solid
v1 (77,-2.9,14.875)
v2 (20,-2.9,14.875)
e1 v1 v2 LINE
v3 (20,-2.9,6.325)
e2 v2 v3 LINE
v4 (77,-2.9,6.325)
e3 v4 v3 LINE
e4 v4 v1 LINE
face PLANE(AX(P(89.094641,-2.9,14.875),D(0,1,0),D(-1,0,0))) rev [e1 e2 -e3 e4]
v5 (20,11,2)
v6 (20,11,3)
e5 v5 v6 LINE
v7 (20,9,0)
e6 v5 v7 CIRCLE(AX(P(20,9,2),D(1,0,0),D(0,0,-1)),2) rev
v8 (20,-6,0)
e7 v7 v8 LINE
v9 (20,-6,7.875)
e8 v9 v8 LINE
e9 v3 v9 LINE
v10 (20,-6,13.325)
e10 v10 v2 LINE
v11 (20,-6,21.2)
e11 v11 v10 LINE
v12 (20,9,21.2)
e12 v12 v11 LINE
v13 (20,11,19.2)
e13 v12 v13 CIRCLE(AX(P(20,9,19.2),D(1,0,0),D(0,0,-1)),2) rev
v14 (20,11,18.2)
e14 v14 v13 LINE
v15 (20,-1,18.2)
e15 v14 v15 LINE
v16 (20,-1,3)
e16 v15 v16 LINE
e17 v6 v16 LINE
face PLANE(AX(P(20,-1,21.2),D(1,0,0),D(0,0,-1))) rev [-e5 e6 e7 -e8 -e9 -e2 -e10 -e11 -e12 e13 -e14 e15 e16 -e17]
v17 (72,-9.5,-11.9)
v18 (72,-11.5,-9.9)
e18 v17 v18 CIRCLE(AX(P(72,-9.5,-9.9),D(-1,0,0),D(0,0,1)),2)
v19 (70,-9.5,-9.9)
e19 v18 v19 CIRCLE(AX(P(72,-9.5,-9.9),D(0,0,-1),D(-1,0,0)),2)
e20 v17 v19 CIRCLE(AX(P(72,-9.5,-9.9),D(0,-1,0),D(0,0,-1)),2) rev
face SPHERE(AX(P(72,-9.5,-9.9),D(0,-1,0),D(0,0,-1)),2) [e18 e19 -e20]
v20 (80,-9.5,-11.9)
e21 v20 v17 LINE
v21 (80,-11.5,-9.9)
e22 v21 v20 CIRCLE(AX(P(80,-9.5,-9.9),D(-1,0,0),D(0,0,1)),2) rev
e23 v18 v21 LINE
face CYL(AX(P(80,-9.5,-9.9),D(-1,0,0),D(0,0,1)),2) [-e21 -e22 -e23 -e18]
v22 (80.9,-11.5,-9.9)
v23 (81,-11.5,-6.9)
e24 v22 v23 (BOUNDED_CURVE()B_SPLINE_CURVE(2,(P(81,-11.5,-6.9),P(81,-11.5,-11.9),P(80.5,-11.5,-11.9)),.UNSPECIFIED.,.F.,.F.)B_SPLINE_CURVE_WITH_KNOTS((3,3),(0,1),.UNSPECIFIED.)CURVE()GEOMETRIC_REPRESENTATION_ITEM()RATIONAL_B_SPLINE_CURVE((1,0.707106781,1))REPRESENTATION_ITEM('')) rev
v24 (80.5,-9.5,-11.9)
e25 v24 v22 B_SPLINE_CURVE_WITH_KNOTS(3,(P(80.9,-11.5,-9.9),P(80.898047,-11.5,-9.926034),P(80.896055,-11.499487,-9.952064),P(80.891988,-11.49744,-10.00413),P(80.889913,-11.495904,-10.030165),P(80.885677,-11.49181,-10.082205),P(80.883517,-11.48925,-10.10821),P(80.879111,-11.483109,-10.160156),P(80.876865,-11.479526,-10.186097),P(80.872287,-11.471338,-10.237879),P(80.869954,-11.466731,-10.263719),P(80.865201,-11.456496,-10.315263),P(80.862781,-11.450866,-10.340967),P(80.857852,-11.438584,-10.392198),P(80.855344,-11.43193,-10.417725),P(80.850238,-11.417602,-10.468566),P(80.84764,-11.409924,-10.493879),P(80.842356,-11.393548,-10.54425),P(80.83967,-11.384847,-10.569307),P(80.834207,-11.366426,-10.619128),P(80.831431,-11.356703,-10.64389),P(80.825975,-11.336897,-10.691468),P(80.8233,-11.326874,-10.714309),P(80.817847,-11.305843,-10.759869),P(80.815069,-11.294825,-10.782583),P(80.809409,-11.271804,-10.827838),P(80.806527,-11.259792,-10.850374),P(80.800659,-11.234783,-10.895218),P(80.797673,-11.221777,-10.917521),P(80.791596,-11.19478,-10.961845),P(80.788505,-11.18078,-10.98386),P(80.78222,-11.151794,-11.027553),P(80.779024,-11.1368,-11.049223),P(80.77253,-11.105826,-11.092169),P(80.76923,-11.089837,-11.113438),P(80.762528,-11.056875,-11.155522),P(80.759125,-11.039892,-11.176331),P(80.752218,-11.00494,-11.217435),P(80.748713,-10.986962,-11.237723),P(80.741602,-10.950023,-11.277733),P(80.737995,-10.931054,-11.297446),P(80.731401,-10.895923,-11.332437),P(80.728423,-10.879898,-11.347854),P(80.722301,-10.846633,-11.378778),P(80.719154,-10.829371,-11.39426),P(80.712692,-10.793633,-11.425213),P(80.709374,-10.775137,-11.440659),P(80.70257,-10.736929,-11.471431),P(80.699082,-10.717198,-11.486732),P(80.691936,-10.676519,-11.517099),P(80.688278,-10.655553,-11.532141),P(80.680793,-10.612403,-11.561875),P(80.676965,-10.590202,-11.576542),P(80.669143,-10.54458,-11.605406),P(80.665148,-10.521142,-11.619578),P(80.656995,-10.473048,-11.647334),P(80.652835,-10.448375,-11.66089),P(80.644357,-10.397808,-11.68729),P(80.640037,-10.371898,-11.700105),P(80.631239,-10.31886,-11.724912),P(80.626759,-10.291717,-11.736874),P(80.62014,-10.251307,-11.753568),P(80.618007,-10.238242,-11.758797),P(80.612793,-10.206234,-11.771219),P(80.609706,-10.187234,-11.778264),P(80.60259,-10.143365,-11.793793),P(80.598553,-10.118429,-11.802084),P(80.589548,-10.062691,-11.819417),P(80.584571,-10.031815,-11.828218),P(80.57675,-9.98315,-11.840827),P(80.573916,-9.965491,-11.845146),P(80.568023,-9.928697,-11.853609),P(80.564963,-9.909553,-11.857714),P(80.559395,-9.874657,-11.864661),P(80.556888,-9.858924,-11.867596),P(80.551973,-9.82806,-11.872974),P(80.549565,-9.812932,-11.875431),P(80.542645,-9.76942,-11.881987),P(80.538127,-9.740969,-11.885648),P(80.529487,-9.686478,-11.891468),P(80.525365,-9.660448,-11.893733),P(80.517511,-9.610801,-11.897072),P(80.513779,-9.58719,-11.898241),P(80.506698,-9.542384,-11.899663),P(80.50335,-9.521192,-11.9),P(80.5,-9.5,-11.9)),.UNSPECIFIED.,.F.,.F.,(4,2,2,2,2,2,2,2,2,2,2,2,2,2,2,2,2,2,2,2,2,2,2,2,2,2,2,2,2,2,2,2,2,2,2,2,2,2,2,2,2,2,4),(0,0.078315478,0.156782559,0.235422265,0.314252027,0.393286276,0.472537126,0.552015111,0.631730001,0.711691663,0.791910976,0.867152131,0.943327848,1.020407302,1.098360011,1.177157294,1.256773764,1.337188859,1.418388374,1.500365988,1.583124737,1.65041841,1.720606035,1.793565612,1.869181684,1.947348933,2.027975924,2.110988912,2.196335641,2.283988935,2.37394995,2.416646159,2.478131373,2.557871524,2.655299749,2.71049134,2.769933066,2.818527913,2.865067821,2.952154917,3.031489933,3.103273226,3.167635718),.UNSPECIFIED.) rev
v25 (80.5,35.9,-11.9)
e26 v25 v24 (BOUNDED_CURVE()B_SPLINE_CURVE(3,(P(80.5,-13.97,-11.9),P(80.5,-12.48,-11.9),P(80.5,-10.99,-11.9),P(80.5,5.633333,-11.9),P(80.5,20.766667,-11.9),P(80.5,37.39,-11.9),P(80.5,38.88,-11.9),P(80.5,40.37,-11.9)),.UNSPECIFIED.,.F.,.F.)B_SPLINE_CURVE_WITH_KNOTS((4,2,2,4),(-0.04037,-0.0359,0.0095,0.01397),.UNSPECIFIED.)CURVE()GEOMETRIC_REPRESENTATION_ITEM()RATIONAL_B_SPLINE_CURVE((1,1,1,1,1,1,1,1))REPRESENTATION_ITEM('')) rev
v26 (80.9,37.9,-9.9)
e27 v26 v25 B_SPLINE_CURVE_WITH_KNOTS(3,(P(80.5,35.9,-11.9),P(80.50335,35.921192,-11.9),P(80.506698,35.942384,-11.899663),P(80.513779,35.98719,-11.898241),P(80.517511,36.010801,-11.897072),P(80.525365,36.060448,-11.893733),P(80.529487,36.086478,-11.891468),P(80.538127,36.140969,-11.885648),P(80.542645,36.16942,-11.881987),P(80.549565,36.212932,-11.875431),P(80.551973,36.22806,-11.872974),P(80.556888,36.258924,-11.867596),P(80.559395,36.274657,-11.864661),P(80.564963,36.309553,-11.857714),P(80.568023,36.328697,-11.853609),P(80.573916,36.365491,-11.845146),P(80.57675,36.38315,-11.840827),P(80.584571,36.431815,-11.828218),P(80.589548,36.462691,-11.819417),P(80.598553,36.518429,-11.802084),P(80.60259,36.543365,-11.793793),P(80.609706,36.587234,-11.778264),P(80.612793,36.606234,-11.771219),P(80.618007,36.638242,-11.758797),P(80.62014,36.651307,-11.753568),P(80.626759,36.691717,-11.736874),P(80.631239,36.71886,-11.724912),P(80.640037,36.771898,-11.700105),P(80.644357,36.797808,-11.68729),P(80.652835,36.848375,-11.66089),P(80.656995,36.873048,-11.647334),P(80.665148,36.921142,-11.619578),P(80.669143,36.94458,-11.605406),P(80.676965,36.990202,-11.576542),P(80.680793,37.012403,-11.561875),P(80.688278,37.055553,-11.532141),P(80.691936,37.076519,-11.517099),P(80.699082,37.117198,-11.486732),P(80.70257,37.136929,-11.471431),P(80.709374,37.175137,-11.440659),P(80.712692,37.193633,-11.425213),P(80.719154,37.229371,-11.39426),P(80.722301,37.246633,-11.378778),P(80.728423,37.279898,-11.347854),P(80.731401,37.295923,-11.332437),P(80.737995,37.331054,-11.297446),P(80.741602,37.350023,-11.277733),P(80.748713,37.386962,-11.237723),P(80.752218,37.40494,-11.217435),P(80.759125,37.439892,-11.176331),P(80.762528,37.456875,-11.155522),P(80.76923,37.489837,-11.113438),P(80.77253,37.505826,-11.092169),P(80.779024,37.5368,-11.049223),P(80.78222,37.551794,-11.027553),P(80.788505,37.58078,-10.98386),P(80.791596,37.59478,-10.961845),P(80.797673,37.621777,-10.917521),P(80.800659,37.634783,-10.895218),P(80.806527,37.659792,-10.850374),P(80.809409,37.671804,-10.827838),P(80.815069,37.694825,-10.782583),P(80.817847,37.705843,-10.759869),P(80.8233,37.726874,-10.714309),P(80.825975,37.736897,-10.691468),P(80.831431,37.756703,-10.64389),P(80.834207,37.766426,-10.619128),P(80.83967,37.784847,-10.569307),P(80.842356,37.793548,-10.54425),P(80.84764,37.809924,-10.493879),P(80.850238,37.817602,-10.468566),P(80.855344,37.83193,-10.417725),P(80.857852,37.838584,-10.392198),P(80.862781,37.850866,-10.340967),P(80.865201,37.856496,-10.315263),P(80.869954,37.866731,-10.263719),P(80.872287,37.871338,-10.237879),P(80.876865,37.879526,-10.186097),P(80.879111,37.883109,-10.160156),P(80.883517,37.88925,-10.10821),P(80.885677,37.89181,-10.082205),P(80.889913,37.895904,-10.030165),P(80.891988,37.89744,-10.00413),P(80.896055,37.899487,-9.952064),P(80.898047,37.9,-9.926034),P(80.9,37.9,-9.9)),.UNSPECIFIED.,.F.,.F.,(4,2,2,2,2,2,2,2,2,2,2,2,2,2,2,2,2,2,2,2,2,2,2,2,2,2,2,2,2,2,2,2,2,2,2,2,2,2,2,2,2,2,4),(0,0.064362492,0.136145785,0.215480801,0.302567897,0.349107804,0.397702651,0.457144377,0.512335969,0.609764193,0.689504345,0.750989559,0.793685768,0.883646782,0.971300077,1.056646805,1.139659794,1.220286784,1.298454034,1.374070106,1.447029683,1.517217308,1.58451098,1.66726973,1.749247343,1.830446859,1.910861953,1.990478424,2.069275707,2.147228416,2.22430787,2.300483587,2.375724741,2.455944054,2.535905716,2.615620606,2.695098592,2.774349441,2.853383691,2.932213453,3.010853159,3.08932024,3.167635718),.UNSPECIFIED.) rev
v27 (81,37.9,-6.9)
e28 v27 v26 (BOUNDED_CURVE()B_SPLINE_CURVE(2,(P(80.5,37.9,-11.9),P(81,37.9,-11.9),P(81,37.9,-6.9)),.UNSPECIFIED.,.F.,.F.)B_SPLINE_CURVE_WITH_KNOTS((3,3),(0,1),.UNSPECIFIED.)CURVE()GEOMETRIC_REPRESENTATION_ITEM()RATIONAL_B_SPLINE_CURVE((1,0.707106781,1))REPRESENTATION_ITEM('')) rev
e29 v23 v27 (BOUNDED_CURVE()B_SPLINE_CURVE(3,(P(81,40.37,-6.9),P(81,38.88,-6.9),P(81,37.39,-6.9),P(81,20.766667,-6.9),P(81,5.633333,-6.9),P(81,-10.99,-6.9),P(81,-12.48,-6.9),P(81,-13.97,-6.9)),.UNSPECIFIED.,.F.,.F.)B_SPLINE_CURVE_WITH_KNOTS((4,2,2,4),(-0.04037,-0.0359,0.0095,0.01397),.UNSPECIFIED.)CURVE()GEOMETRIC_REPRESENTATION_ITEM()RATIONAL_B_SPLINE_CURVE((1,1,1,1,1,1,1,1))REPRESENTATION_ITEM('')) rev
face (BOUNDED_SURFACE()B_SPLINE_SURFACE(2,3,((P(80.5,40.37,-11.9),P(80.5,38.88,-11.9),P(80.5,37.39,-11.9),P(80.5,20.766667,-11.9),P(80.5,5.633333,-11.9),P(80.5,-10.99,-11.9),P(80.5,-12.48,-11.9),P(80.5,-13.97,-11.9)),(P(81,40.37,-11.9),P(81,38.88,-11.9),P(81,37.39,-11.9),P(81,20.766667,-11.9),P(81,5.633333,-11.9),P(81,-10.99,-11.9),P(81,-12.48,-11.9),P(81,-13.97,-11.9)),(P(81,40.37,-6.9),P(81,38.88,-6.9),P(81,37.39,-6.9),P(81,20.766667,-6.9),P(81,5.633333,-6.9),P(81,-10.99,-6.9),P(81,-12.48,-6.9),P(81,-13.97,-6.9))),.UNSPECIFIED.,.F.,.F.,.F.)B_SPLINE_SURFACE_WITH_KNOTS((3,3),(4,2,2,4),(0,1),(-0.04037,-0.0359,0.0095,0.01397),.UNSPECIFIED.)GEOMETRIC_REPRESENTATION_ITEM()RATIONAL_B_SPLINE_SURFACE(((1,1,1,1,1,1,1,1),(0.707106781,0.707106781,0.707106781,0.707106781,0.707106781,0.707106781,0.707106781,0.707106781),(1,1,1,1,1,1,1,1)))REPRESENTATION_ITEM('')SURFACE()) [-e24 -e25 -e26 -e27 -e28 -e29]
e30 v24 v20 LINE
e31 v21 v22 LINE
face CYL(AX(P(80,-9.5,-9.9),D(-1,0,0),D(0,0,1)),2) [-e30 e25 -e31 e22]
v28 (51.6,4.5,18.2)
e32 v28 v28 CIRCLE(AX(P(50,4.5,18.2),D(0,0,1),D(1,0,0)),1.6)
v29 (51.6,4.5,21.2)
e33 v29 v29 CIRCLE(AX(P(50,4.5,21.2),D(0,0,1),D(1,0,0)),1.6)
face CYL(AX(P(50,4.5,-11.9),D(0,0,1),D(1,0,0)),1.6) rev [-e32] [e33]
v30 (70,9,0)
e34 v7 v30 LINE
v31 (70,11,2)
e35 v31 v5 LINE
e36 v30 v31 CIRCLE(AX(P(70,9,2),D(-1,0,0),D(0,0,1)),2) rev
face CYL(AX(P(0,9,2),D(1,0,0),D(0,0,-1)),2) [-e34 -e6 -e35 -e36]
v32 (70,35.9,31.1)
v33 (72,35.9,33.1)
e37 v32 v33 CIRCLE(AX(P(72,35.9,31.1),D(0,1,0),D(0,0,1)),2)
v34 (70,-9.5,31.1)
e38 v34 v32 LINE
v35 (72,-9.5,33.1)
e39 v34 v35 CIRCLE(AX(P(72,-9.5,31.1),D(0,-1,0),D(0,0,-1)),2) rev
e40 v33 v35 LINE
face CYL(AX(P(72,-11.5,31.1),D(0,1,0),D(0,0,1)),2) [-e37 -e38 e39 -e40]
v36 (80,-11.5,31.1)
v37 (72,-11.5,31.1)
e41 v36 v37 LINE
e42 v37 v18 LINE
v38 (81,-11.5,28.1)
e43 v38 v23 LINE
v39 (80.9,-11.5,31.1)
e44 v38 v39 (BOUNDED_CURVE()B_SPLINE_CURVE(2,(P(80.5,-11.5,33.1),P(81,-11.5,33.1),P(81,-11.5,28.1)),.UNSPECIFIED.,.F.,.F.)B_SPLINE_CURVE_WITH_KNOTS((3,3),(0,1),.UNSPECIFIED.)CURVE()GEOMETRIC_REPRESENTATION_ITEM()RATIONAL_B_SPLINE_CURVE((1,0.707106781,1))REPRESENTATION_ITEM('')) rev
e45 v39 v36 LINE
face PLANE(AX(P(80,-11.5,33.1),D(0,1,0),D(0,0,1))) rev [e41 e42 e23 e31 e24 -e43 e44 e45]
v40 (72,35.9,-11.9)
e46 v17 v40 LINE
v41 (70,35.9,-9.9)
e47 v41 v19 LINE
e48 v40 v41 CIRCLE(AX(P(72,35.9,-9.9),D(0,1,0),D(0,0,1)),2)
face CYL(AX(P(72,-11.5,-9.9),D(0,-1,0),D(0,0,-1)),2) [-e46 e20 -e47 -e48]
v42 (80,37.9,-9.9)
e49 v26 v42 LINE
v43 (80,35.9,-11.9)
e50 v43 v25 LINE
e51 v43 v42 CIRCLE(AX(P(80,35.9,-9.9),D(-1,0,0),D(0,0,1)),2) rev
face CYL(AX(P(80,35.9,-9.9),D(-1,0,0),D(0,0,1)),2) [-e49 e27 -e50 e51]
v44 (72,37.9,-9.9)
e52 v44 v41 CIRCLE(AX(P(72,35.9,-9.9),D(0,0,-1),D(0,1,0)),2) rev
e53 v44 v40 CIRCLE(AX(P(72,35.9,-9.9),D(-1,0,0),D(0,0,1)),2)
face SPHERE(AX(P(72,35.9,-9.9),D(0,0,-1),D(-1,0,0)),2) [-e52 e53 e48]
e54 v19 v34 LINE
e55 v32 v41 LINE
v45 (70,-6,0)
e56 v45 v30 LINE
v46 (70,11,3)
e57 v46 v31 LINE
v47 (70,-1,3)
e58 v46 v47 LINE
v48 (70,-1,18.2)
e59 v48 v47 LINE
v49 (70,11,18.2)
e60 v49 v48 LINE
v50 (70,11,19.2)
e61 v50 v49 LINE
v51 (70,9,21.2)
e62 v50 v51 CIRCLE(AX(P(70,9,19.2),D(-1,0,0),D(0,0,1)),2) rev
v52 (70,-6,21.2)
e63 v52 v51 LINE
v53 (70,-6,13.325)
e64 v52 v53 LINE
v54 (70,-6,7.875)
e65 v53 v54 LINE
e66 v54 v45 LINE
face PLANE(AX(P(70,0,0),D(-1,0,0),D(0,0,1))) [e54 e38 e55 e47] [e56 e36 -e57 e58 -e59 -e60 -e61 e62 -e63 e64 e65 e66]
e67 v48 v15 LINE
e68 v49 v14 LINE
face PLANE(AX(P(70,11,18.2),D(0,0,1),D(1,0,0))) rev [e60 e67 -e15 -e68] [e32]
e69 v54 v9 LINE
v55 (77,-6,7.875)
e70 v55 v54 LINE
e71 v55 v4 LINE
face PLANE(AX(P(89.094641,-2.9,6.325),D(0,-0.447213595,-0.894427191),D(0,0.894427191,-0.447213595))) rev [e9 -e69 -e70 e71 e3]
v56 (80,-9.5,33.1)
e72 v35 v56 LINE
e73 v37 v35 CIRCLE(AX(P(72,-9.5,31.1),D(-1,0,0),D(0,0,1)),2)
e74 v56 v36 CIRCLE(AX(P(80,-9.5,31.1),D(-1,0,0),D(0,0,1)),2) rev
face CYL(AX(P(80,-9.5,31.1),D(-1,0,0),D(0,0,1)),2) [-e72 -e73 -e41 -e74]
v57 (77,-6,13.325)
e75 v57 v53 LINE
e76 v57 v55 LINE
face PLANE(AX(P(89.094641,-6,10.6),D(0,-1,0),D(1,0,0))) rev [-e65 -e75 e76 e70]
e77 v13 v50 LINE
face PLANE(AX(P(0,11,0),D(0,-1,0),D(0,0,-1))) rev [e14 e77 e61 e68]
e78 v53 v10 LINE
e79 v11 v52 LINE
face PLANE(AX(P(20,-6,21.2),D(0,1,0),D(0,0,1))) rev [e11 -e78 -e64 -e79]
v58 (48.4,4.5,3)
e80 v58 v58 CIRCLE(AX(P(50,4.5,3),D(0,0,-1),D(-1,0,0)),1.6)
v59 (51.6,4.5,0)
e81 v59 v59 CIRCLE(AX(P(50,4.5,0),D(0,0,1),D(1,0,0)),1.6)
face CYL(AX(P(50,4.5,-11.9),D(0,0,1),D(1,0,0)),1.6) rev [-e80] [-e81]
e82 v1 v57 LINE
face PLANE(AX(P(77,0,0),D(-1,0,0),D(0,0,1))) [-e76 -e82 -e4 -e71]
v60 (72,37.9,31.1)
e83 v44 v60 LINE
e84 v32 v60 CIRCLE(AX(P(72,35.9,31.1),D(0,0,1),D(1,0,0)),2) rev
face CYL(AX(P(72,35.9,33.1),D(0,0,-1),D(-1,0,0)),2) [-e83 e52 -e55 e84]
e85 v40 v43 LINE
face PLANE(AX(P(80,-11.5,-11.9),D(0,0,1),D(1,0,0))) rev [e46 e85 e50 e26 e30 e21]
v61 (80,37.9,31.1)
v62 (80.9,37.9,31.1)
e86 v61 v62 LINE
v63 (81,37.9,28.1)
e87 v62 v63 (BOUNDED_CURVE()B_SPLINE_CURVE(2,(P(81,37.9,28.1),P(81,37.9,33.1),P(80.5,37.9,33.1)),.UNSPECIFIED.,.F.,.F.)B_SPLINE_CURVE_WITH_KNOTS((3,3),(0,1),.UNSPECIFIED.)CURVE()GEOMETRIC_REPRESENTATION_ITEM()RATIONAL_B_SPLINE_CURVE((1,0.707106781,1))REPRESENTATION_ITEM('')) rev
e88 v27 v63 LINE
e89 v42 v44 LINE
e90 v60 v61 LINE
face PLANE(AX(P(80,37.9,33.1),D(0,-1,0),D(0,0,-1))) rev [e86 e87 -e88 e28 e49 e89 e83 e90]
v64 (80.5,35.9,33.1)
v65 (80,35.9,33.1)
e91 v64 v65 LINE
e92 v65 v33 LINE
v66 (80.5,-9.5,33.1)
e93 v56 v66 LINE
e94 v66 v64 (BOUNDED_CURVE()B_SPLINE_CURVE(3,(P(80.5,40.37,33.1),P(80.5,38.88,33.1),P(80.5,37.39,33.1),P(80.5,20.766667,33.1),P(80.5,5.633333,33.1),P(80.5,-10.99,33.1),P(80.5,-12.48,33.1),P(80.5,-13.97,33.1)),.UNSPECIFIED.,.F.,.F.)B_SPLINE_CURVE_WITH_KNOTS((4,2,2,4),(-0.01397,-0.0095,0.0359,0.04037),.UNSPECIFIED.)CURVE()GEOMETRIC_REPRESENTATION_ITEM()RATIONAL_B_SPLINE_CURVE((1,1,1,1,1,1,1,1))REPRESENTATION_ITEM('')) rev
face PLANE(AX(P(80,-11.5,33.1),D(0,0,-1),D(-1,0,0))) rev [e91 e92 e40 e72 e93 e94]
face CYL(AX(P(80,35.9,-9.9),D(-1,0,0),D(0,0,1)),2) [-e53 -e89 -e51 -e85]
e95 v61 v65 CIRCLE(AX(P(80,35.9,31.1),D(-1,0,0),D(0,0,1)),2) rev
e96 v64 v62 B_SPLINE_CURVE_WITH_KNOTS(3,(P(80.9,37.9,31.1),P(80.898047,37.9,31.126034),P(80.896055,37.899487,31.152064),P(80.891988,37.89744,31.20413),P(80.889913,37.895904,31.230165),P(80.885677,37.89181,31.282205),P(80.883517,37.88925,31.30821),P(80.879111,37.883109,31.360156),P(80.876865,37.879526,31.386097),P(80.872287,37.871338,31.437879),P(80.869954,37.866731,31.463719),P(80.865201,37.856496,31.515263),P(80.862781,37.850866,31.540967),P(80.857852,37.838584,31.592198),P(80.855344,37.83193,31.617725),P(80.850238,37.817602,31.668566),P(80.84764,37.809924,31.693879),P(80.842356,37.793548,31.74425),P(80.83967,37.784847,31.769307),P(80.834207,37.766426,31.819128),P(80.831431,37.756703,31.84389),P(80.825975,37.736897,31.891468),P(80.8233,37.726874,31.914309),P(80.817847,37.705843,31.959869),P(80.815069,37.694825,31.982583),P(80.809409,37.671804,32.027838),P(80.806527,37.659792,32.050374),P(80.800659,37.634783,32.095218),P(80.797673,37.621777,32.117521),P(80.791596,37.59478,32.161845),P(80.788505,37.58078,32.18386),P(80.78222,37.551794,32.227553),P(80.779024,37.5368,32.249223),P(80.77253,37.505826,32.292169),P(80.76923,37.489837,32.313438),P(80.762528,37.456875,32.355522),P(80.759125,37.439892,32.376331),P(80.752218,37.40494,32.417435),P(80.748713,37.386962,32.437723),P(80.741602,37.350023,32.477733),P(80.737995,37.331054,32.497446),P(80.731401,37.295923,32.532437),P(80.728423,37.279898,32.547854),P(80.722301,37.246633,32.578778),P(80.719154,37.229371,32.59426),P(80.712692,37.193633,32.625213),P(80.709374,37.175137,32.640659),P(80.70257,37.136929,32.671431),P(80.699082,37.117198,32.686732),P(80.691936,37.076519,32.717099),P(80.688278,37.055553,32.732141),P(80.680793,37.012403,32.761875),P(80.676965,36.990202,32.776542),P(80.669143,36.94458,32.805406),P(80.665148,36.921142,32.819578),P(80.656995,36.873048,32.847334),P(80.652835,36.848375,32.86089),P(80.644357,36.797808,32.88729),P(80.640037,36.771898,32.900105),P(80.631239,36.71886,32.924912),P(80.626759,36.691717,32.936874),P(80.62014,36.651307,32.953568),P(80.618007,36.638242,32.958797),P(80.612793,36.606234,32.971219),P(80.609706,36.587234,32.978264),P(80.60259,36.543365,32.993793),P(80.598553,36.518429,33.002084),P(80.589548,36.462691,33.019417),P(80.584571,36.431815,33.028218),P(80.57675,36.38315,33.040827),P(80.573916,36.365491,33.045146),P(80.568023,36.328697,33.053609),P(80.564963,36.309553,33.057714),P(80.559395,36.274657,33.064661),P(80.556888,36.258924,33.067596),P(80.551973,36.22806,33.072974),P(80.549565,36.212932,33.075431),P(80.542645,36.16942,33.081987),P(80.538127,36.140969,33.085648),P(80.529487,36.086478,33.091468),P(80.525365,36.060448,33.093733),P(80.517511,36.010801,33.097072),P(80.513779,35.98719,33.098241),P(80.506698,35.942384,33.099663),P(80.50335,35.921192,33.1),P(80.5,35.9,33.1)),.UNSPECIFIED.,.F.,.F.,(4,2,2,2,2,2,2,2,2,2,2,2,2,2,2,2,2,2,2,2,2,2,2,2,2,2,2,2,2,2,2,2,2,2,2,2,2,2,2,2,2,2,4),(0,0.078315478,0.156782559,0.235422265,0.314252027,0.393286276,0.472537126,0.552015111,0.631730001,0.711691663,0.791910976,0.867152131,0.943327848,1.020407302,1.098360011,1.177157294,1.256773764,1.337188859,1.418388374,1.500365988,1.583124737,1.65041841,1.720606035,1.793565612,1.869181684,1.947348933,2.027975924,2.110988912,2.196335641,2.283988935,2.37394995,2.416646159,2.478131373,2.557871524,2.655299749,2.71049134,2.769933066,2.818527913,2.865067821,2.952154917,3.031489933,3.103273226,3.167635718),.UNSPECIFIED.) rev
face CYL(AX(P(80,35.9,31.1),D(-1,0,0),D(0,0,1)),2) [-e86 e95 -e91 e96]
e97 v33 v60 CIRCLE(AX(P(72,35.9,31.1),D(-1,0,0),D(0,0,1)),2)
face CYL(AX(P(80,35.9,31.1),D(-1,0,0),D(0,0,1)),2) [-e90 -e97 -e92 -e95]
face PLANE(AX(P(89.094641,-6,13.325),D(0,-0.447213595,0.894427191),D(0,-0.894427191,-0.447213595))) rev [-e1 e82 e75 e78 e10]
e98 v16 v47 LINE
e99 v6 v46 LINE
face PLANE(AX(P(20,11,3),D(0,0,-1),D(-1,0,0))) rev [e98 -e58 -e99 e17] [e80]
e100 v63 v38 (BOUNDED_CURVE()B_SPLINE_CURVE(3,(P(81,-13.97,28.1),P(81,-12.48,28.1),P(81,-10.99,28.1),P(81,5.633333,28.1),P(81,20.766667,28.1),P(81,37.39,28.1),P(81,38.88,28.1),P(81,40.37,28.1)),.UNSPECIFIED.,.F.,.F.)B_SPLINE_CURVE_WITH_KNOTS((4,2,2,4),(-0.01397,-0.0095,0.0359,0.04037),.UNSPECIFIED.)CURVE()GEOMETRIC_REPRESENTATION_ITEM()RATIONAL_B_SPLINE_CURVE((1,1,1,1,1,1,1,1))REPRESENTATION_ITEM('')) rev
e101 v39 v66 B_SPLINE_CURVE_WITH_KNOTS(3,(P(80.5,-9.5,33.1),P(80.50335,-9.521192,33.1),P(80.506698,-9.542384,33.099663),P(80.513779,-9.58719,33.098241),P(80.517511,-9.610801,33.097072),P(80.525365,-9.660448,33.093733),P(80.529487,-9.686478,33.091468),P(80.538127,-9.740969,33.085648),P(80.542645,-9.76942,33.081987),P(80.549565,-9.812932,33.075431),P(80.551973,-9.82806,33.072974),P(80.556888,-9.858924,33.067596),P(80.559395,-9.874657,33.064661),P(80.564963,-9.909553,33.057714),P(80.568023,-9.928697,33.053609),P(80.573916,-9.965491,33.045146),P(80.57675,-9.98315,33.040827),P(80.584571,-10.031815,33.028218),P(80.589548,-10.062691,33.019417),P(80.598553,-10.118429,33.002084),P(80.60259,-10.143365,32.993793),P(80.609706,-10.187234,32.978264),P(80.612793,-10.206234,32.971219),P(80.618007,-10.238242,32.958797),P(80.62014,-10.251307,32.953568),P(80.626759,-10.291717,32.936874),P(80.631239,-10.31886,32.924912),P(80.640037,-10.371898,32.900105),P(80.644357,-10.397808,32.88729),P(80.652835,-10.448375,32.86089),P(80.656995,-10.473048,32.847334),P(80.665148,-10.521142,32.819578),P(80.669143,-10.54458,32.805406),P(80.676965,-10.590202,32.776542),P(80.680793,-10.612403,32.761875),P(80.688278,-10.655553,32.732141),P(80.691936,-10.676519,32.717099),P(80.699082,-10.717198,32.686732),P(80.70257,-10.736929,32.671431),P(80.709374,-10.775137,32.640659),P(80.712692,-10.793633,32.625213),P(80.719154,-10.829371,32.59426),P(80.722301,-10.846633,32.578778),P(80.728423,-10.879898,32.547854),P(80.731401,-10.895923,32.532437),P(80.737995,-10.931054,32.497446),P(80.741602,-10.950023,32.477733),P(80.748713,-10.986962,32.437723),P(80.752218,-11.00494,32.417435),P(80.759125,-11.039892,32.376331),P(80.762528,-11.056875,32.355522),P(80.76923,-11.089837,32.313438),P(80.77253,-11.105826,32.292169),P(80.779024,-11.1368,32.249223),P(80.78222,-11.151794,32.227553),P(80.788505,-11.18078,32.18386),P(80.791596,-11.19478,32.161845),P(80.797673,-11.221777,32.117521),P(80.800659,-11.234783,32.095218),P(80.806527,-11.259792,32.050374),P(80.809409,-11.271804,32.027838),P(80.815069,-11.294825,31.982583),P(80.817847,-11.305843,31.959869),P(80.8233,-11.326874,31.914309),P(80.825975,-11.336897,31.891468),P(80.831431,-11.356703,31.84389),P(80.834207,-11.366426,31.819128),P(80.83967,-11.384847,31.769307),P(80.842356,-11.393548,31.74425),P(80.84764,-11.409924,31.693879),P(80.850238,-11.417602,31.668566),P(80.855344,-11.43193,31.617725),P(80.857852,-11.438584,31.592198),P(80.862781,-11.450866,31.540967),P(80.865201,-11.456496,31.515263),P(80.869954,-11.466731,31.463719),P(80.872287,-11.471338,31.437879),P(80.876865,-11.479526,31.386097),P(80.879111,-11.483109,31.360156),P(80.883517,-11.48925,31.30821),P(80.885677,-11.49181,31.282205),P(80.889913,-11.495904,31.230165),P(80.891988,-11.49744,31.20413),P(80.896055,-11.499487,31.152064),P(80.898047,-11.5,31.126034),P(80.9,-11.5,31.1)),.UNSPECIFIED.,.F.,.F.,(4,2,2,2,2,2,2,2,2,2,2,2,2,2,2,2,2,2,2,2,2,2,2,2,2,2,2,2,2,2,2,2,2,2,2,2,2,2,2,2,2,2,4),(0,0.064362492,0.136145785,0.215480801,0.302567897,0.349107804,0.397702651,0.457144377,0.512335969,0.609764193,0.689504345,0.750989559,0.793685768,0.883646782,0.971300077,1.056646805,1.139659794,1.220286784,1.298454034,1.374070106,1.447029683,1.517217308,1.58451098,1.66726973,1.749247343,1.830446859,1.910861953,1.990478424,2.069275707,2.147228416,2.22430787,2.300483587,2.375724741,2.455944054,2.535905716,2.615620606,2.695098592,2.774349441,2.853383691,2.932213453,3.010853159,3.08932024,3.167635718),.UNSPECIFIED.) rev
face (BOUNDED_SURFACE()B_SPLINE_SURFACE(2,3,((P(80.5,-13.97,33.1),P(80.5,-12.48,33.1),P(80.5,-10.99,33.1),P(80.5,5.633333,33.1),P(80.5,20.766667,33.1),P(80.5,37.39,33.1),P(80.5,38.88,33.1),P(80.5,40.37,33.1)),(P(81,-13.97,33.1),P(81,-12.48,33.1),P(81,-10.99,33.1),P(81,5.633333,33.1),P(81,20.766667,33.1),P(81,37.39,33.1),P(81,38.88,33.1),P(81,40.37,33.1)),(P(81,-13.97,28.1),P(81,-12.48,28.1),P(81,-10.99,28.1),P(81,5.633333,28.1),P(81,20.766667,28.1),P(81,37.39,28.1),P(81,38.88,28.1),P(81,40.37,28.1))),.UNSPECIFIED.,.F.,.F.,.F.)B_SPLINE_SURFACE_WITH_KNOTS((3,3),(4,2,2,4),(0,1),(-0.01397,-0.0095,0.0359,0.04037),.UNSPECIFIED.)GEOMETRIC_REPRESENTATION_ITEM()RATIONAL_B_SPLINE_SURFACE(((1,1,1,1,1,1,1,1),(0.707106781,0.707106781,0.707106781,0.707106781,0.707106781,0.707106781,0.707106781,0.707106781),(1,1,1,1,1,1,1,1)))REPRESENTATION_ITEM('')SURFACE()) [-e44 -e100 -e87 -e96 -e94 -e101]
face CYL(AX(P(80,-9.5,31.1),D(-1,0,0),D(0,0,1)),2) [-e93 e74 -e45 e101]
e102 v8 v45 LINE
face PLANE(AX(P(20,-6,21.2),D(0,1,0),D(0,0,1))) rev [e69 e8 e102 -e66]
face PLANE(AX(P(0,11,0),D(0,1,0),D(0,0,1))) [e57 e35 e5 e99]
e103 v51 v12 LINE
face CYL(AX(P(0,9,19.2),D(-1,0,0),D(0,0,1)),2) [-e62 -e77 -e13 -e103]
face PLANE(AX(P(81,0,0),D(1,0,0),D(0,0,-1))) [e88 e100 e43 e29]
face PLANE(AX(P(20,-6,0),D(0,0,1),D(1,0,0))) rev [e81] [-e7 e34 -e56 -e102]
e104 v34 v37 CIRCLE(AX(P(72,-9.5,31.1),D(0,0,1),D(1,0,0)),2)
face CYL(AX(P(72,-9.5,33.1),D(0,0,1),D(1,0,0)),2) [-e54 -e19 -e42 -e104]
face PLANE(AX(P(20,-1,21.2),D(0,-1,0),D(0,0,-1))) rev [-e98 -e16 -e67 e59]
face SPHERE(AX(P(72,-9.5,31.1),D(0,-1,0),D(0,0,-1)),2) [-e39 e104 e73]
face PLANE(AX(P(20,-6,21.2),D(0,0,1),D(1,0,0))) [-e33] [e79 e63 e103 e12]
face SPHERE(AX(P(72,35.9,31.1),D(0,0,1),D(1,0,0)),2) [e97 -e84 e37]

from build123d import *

# Parameters (mm, degrees)
EXTRUDE_1_OUTLINE_W = 50
EXTRUDE_1_OUTLINE_H = 5
EXTRUDE_1_DEPTH     = 21.2
SKETCH_3_W          = 45
SKETCH_3_H          = 49.4
EXTRUDE_1_2_DEPTH   = 10
CUT_EXTRUDE_1_DEPTH = 57
SKETCH_5_W          = 50
SKETCH_5_H          = 3
EXTRUDE_2_DEPTH     = 12
SKETCH_8_R          = 1.6
CUT_EXTRUDE_2_DEPTH = 95.509364615
FILLET_1_R          = 2
SKETCH_9_W          = 45
SKETCH_9_H          = 49.4
EXTRUDE_3_DEPTH     = 1
FILLET_2_R          = 2
FILLET_3_SIZE       = 5
FILLET_3_SIZE_2     = 0.5


with BuildPart() as part:
    # Extrude 1: read off the stored shape, not the designer's step
    # Extrude 1 outline → Extrude 1 (new body)
    with BuildSketch(Plane.XY):
        with Locations((45, -3.5)):
            Rectangle(EXTRUDE_1_OUTLINE_W, EXTRUDE_1_OUTLINE_H)
    extrude(amount=EXTRUDE_1_DEPTH)

    # 草图3 → Extrude 1 2 (add)
    with BuildSketch(Plane(origin=(70, 0, 0), x_dir=(0, 0, -1), z_dir=(1, 0, 0))):
        with Locations((-10.6, 13.2)):
            Rectangle(SKETCH_3_W, SKETCH_3_H)
    extrude(amount=EXTRUDE_1_2_DEPTH)

    # 草图4 → 切除-拉伸1 (cut)
    with BuildSketch(Plane.ZY.offset(-20)):
        Polygon((10.6, -6), (13.325, -6), (14.875, -2.9), (6.325, -2.9), (7.875, -6), align=None)
    extrude(amount=-CUT_EXTRUDE_1_DEPTH, mode=Mode.SUBTRACT)

    # 草图5 → 凸台-拉伸2 (add)
    with BuildSketch(Plane(origin=(0, -1, 0), x_dir=(1, 0, 0), z_dir=(0, 1, 0))):
        with Locations((45, -1.5)):
            Rectangle(SKETCH_5_W, SKETCH_5_H)
        with Locations((45, -19.7)):
            Rectangle(SKETCH_5_W, SKETCH_5_H)
    extrude(amount=EXTRUDE_2_DEPTH)

    # 草图8 → 切除-拉伸2 (cut, through all)
    with BuildSketch(Plane.XY.offset(21.2)):
        with Locations((50, 4.5)):
            Circle(SKETCH_8_R)
    extrude(amount=-CUT_EXTRUDE_2_DEPTH, mode=Mode.SUBTRACT)

    # 圆角1
    fillet_1_edges = [part.edges().sort_by_distance(p)[0] for p in [
        (70, 13.2, 33.1),
        (75, 37.9, 33.1),
        (70, -11.5, 10.6),
        (75, -11.5, 33.1),
        (70, 13.2, -11.9),
        (75, -11.5, -11.9),
        (70, 37.9, 10.6),
        (75, 37.9, -11.9),
        (45, 11, 0),
        (45, 11, 21.2),
    ]]
    fillet(fillet_1_edges, radius=FILLET_1_R)

    # 草图9 → 凸台-拉伸3 (add)
    with BuildSketch(Plane(origin=(80, 0, 0), x_dir=(0, 0, -1), z_dir=(1, 0, 0))):
        with Locations((-10.6, 13.2)):
            Rectangle(SKETCH_9_W, SKETCH_9_H)
    extrude(amount=EXTRUDE_3_DEPTH)

    # 圆角2
    fillet_2_edges = [part.edges().sort_by_distance(p)[0] for p in [
        (80.5, 37.9, 33.1),
        (80.5, -11.5, 33.1),
        (80.5, -11.5, -11.9),
        (80.5, 37.9, -11.9),
    ]]
    fillet(fillet_2_edges, radius=FILLET_2_R)

    # 圆角3
    # a fillet whose section is not a circle: 5, 0.5 mm, written as the material it takes off along each edge
    with BuildSketch(Plane(origin=(81, 48.4, -11.9), x_dir=(0, 0, 1), z_dir=(0, -1, 0)), Plane(origin=(81, -22, 33.1), x_dir=(0, 0, -1), z_dir=(0, 1, 0))) as fillet_3_piece_1:
        with BuildLine():
            Bezier((FILLET_3_SIZE, 0), (0, 0), (0, FILLET_3_SIZE_2), weights=[1, 0.707106781, 1])
            Line((0, FILLET_3_SIZE_2), (0, 0))
            Line((0, 0), (FILLET_3_SIZE, 0))
        make_face()
    extrude(amount=70.4, mode=Mode.SUBTRACT)


solid = part.part
